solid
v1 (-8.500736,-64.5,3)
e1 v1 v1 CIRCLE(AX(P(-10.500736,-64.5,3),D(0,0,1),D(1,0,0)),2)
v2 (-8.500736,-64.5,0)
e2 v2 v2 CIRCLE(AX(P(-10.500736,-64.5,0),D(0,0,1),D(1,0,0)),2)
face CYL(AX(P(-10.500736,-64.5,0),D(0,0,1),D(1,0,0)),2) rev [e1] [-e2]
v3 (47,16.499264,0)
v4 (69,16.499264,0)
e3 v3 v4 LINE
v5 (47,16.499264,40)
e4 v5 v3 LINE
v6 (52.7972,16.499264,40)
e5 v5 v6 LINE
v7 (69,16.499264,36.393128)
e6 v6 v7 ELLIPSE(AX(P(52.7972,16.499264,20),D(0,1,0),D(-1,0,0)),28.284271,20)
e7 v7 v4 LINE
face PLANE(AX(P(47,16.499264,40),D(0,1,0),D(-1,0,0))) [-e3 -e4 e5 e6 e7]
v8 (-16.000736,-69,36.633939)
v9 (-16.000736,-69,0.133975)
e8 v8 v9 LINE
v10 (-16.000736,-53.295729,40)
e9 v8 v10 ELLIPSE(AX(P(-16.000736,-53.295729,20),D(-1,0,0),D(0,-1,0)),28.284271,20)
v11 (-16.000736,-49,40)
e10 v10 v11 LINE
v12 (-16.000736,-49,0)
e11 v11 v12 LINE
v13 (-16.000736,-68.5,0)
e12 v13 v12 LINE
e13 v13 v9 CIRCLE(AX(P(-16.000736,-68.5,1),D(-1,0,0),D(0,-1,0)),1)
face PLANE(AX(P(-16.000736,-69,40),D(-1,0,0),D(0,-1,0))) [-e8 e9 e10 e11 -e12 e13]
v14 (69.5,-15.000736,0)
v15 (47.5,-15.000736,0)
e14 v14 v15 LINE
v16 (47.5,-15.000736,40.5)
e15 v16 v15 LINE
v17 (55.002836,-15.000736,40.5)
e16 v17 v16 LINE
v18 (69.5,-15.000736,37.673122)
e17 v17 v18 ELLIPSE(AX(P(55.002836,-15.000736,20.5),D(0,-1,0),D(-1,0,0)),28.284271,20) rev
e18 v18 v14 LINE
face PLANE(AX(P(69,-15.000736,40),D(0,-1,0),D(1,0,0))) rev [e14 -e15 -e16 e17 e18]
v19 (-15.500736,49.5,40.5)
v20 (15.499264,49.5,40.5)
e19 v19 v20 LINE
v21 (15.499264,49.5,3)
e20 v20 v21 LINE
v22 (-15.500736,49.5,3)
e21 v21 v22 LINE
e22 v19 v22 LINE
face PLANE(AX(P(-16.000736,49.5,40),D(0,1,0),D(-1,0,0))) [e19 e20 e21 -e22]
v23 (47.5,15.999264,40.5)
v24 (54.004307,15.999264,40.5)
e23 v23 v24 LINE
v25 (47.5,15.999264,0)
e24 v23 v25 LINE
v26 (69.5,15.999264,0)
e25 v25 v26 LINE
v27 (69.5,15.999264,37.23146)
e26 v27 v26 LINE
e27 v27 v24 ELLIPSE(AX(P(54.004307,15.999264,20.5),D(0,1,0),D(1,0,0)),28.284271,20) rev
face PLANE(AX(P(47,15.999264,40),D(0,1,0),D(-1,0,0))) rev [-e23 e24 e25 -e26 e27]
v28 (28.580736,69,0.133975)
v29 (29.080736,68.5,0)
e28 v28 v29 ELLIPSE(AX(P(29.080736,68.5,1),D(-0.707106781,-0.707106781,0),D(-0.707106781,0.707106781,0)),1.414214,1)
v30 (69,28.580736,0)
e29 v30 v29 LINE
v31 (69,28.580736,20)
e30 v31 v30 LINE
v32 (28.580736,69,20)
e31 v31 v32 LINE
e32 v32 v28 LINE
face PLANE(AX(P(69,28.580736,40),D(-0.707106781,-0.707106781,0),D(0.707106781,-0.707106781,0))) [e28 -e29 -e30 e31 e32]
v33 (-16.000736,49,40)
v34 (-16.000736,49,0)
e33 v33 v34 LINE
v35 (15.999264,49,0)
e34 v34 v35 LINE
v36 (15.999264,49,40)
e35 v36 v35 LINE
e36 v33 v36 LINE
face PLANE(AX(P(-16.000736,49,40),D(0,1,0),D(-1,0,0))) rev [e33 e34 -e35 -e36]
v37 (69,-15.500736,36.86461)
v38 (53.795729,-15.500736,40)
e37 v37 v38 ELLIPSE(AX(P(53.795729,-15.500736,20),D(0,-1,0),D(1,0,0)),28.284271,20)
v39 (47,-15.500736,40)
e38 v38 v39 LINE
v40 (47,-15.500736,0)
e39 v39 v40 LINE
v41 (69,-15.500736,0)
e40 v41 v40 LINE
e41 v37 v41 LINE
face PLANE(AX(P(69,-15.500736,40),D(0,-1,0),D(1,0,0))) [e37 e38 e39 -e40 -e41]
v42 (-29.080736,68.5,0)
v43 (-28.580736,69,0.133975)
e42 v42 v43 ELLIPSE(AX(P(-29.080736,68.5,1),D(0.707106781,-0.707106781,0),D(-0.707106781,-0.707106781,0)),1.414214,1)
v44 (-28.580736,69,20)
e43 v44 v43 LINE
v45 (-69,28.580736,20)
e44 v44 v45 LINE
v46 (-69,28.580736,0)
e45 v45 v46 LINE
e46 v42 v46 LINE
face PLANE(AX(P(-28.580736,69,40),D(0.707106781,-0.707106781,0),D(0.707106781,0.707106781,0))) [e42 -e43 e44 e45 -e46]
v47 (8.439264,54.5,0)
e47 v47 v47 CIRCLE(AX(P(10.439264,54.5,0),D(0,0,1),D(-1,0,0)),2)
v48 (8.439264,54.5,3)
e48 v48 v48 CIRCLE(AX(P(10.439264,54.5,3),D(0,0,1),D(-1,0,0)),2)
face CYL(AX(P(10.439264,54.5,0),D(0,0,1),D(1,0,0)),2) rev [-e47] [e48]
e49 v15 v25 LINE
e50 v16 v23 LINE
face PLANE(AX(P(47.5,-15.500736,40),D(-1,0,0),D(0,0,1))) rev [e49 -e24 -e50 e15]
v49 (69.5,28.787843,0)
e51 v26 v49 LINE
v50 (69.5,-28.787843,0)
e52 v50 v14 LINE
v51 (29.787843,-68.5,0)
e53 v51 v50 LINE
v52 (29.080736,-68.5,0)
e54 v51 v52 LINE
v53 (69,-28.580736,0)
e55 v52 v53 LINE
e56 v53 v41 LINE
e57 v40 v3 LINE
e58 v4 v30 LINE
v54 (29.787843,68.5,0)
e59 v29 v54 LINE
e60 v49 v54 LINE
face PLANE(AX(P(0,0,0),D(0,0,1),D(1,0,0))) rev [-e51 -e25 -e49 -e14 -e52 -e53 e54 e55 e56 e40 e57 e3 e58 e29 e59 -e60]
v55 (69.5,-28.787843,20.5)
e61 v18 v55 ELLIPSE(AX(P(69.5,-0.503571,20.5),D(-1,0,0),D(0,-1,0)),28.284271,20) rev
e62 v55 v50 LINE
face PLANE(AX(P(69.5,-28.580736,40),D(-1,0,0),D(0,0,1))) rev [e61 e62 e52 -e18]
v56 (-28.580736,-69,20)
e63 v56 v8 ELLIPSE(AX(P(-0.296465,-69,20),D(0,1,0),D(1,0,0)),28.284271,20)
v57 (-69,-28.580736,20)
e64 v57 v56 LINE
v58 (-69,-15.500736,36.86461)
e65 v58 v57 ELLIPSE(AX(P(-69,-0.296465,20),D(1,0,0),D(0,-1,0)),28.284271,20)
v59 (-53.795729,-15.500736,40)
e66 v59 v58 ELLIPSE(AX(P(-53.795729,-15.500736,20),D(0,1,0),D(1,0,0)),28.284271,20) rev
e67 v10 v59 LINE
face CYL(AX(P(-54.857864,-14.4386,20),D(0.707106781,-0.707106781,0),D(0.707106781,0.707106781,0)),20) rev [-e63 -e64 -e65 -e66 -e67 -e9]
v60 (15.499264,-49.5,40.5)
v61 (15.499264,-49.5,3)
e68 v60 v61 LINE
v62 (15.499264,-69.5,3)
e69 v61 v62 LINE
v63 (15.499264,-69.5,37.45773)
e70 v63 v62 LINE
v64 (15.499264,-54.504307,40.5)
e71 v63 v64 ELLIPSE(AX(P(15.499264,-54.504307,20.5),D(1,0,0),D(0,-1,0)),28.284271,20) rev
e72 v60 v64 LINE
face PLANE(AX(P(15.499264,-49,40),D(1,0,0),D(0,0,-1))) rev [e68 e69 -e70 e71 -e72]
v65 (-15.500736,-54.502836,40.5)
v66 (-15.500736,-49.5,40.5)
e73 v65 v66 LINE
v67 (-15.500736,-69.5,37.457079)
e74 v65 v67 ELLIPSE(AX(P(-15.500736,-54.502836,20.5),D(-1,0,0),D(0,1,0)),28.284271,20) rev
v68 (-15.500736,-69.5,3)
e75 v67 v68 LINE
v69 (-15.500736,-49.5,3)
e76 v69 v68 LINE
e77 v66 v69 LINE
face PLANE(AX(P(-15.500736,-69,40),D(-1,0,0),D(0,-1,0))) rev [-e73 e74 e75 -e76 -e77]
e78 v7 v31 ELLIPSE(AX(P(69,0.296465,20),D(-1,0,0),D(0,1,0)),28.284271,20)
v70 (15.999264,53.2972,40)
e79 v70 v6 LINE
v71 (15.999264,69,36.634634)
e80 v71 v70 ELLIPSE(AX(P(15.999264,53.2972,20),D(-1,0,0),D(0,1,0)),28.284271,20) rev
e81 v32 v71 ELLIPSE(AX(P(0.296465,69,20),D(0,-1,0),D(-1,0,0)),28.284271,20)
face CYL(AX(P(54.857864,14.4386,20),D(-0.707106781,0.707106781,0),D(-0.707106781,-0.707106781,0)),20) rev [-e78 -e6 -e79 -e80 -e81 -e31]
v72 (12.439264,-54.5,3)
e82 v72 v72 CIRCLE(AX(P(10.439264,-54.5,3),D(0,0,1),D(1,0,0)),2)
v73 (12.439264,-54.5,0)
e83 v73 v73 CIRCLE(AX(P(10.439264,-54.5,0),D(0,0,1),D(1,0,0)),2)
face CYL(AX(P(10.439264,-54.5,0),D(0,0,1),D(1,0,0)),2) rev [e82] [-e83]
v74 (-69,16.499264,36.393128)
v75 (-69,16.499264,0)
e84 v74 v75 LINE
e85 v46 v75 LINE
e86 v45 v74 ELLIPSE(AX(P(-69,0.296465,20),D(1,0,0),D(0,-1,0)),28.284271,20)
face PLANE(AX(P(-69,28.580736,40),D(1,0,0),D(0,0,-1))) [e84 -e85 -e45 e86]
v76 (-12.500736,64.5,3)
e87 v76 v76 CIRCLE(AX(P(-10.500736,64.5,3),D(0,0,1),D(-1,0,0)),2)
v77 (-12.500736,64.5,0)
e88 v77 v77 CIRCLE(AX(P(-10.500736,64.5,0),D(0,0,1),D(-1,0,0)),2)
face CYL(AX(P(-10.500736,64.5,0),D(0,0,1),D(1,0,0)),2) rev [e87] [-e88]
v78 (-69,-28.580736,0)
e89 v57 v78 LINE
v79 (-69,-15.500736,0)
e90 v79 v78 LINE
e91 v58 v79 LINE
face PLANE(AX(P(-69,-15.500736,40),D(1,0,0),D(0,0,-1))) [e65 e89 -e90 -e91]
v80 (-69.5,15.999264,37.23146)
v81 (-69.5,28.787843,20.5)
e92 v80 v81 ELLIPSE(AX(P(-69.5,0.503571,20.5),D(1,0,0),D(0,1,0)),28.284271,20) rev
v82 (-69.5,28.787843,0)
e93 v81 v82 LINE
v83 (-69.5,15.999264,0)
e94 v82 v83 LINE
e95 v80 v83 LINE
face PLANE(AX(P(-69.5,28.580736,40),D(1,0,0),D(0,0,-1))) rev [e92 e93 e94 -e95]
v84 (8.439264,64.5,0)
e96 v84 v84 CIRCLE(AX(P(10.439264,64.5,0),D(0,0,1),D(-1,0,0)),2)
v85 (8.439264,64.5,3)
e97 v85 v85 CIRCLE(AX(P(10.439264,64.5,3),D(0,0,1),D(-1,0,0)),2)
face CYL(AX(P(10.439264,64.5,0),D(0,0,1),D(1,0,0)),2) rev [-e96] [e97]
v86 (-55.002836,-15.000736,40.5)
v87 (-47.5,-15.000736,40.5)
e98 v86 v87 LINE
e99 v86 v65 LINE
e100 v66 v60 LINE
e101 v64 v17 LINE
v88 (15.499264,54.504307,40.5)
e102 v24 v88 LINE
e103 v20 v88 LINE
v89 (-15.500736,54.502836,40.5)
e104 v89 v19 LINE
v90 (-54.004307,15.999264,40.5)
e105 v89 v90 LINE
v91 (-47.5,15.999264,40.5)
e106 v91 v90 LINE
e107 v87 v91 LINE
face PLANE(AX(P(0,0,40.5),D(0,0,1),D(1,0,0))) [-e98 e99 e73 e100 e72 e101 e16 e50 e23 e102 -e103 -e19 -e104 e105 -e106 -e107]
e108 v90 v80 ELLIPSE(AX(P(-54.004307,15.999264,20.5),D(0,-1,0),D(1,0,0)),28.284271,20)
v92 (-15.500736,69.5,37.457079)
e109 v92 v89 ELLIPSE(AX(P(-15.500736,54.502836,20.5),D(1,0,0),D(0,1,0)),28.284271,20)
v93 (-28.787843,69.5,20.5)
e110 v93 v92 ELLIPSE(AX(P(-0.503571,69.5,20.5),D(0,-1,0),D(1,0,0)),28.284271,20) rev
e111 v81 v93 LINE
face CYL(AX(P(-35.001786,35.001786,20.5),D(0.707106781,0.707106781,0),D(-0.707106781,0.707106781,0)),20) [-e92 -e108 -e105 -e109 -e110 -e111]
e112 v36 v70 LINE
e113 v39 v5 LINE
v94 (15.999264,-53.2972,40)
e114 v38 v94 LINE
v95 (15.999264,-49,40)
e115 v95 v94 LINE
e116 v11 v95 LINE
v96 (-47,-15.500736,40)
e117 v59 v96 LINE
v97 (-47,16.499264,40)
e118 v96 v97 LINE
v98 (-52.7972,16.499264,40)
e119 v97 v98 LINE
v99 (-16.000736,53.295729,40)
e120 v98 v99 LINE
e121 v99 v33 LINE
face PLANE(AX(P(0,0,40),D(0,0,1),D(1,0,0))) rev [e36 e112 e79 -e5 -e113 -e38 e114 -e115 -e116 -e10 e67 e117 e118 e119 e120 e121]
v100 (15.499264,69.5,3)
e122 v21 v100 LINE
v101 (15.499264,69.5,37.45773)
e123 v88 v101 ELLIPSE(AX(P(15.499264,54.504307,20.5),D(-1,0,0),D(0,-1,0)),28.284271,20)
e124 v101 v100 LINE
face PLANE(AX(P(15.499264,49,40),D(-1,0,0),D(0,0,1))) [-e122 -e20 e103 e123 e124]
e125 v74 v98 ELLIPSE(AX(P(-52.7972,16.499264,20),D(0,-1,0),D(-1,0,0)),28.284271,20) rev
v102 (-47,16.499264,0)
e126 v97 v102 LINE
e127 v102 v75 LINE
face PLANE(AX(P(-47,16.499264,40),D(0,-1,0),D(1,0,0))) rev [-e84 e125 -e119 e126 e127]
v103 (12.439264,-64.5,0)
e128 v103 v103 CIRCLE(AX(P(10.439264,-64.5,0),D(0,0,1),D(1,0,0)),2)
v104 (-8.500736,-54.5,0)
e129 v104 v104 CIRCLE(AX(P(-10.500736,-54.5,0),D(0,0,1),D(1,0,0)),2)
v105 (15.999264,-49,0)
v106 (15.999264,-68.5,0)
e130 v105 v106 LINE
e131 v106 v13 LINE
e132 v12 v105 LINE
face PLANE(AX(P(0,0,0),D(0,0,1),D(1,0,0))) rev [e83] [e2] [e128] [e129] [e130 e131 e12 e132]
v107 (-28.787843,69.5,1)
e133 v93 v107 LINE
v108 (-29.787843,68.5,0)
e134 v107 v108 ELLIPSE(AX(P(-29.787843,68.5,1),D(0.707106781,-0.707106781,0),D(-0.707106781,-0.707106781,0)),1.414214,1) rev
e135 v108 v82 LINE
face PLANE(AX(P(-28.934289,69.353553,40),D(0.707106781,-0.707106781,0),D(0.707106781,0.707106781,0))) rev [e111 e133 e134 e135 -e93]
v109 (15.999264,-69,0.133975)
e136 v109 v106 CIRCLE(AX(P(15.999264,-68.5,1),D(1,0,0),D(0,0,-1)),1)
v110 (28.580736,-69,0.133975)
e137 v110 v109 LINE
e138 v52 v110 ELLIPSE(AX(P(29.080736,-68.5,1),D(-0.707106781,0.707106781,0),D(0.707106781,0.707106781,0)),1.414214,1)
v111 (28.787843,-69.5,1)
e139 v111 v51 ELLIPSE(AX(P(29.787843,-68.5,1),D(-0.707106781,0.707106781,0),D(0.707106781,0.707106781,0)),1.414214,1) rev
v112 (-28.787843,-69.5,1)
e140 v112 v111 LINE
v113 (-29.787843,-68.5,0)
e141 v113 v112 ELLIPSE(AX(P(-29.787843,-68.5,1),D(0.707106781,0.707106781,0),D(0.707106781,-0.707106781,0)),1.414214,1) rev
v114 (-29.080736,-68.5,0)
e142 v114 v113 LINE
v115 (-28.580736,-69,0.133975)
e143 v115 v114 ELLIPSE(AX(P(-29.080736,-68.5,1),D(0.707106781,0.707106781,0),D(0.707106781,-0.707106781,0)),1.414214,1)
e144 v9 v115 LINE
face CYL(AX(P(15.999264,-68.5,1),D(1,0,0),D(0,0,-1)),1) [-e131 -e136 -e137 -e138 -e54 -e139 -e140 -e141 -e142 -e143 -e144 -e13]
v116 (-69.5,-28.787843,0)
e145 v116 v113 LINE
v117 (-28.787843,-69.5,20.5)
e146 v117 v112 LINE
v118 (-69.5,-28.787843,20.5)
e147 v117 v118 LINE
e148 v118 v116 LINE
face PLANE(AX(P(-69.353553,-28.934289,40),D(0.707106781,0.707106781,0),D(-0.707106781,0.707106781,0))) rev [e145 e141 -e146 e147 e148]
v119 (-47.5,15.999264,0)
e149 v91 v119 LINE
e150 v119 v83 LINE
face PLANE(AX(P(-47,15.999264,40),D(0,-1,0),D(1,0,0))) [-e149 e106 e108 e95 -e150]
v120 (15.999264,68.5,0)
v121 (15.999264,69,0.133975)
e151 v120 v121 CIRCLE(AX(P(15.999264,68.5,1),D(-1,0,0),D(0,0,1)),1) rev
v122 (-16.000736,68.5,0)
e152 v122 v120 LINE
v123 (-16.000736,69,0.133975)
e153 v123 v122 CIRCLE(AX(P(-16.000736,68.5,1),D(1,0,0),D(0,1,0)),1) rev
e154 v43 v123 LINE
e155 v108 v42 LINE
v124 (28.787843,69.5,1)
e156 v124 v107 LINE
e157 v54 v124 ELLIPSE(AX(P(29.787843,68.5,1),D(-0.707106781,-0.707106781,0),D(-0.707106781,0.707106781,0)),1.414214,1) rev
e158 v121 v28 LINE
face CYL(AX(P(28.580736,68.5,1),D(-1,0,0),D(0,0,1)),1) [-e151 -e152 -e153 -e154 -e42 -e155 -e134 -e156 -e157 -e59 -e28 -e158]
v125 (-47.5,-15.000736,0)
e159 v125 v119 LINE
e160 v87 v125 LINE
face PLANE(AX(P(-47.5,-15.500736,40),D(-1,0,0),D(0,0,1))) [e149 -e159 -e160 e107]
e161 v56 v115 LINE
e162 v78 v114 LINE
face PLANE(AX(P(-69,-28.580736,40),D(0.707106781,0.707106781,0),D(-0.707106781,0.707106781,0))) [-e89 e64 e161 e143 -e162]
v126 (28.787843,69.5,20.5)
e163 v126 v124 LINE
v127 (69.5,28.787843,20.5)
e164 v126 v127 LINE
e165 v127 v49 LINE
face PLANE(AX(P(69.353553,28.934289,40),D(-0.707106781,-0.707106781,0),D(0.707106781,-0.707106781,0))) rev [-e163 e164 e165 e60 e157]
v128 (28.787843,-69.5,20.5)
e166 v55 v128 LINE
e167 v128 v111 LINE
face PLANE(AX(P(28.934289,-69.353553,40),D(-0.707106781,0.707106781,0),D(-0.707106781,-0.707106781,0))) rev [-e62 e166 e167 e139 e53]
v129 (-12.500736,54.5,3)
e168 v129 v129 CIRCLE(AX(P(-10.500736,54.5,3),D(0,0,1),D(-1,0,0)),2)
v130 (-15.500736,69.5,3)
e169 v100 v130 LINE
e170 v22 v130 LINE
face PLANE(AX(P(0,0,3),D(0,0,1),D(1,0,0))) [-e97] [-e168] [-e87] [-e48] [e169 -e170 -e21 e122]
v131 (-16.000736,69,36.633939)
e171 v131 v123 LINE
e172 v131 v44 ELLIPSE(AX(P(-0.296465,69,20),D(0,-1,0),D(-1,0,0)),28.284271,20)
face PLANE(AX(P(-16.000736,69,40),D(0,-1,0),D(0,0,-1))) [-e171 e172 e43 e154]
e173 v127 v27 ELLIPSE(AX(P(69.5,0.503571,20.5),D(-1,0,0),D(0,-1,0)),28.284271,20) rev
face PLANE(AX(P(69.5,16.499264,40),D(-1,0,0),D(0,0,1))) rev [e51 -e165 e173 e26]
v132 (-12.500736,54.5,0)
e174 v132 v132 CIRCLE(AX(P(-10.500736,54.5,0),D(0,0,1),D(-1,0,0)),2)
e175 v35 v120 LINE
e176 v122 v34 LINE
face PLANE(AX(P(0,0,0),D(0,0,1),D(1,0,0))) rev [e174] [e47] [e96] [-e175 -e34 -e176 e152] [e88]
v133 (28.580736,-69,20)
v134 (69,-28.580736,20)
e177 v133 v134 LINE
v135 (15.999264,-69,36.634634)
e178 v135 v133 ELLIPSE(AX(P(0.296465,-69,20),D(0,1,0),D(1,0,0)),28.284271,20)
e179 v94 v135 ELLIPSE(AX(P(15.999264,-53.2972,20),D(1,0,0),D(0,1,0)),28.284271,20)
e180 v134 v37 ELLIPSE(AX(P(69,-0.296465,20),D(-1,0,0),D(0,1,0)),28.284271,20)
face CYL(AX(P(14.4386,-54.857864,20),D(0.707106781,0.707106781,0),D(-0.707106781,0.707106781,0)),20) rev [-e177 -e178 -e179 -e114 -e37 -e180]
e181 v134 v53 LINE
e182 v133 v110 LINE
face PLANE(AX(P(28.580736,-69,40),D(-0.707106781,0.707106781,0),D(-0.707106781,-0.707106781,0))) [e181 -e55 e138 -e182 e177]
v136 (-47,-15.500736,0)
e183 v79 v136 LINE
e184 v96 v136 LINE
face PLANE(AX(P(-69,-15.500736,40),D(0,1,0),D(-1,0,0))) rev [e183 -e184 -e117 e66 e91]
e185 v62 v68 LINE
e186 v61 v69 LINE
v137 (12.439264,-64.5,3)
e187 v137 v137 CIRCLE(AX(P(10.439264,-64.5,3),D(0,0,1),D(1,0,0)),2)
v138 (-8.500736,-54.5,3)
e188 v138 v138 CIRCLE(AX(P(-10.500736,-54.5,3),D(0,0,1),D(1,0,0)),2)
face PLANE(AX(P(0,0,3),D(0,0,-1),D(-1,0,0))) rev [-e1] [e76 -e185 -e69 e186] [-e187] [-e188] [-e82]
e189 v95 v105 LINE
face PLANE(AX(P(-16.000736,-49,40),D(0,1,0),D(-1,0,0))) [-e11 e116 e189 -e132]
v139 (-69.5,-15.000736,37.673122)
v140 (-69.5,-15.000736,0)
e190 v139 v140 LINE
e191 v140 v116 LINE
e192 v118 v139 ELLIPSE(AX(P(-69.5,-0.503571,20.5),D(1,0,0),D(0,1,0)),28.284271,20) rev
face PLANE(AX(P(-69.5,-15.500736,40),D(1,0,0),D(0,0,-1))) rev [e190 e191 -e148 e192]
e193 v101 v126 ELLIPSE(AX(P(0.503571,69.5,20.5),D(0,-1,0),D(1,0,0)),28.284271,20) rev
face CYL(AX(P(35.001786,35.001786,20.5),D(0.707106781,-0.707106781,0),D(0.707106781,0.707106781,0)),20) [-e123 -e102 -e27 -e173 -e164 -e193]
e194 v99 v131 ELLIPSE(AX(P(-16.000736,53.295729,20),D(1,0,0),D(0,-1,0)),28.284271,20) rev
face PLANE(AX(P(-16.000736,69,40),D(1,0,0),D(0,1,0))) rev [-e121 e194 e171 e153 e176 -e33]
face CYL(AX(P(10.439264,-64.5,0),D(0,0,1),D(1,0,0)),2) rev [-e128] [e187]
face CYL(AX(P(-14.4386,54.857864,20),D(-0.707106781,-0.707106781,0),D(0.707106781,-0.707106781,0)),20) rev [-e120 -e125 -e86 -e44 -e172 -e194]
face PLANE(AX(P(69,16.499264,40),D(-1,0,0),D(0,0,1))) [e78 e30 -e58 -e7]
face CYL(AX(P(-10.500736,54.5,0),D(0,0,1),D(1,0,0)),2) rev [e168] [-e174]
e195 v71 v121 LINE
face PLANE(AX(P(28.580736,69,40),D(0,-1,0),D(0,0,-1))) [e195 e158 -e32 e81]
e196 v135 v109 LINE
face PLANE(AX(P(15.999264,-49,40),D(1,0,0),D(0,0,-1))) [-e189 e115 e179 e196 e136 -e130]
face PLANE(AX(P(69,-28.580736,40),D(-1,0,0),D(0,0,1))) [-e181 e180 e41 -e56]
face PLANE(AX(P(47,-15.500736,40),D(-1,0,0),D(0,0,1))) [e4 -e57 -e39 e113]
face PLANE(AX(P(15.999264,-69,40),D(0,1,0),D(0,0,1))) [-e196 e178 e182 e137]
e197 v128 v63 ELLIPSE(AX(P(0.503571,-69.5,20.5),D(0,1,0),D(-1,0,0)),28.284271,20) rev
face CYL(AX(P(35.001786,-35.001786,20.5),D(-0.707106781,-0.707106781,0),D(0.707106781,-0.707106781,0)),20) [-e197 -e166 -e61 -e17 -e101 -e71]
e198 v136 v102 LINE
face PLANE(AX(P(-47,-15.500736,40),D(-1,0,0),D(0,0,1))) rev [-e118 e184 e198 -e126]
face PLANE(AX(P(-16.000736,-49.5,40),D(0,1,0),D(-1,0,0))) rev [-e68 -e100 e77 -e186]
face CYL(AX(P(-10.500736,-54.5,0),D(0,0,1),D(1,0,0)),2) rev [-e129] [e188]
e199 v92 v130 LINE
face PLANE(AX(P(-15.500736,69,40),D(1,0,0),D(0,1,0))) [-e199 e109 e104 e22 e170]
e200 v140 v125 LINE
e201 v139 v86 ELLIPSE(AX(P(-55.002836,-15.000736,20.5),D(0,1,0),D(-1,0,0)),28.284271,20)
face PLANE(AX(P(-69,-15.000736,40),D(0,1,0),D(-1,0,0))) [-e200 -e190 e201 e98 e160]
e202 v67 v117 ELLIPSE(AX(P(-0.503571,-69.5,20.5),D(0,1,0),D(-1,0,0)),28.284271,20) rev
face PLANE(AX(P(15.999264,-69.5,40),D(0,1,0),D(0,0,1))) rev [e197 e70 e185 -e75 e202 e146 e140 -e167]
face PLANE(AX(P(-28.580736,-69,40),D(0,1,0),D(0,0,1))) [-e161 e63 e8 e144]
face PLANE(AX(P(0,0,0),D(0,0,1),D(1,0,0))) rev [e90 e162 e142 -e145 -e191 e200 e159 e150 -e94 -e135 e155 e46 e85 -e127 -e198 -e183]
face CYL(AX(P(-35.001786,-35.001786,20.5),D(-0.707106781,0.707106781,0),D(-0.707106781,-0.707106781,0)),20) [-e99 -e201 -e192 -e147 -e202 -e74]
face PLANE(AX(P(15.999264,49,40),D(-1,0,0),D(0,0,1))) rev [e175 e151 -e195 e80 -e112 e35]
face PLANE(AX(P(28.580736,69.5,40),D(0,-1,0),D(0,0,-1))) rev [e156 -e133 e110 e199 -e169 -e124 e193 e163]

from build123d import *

# Parameters (mm, degrees)
RESSALTO_EXTRUS_O1_DEPTH = 40
CASCA1_T                 = 0.5
ESBO_O2_W                = 31
ESBO_O2_H                = 20
RESSALTO_EXTRUS_O2_DEPTH = 3
FILETE1_R                = 20
FILETE2_R                = 20
ESBO_O3_R                = 2
CORTE_EXTRUS_O1_DEPTH    = 106.198621664
FILETE3_R                = 1
FILETE4_R                = 1


with BuildPart() as part:
    # Esboço1 → Ressalto-extrusão1 (new body)
    with BuildSketch(Plane.XY):
        Polygon((-16.000735804, -69), (-16.000735804, -49), (15.999264196, -49), (15.999264196, -69), (28.580735804, -69), (69, -28.580735804), (69, -15.500735804), (47, -15.500735804), (47, 16.499264196), (69, 16.499264196), (69, 28.580735804), (28.580735804, 69), (15.999264196, 69), (15.999264196, 49), (-16.000735804, 49), (-16.000735804, 69), (-28.580735804, 69), (-69, 28.580735804), (-69, 16.499264196), (-47, 16.499264196), (-47, -15.500735804), (-69, -15.500735804), (-69, -28.580735804), (-28.580735804, -69), align=None)
    extrude(amount=RESSALTO_EXTRUS_O1_DEPTH)

    # Casca1
    casca1_openings = [part.faces().sort_by_distance(p)[0] for p in [
        (7.1958e-05, -0.05370825, 0),
    ]]
    offset(amount=CASCA1_T, openings=casca1_openings, kind=Kind.INTERSECTION)

    # Esboço2 → Ressalto-extrusão2 (add)
    with BuildSketch(Plane.XY):
        with Locations((-0.000735804, -59.5)):
            Rectangle(ESBO_O2_W, ESBO_O2_H)
        with Locations((-0.000735804, 59.5)):
            Rectangle(ESBO_O2_W, ESBO_O2_H)
    extrude(amount=RESSALTO_EXTRUS_O2_DEPTH)

    # Filete1
    filete1_edges = [part.edges().sort_by_distance(p)[0] for p in [
        (-49.143921292, 49.143921292, 40.5),
        (49.143921292, -49.143921292, 40.5),
        (-49.143921292, -49.143921292, 40.5),
        (49.143921292, 49.143921292, 40.5),
    ]]
    fillet(filete1_edges, radius=FILETE1_R)

    # Filete2
    filete2_edges = [part.edges().sort_by_distance(p)[0] for p in [
        (-48.790367902, 48.790367902, 40),
        (-48.790367902, -48.790367902, 40),
        (48.790367902, -48.790367902, 40),
        (48.790367902, 48.790367902, 40),
    ]]
    fillet(filete2_edges, radius=FILETE2_R)

    # Esboço3 → Corte-extrusão1 (cut, through all)
    with BuildSketch(Plane.XY.offset(3)):
        with Locations((-10.500735804, -54.5)):
            Circle(ESBO_O3_R)
        with Locations((-10.500735804, -64.5)):
            Circle(ESBO_O3_R)
        with Locations((10.439264196, -64.5)):
            Circle(ESBO_O3_R)
        with Locations((10.439264196, -54.5)):
            Circle(ESBO_O3_R)
        with Locations(Location((10.439264196, 54.5, 0), (0, 0, 180))):
            Circle(ESBO_O3_R)
        with Locations(Location((10.439264196, 64.5, 0), (0, 0, 180))):
            Circle(ESBO_O3_R)
        with Locations(Location((-10.500735804, 64.5, 0), (0, 0, 180))):
            Circle(ESBO_O3_R)
        with Locations(Location((-10.500735804, 54.5, 0), (0, 0, 180))):
            Circle(ESBO_O3_R)
    extrude(amount=-CORTE_EXTRUS_O1_DEPTH, mode=Mode.SUBTRACT)

    # Filete3
    # the kernel refuses this fillet: 1 mm, written as the material it takes off along each edge
    with BuildSketch(Plane(origin=(31.287842585, -69.5, 0), x_dir=(0, 1, 0), z_dir=(-1, 0, 0))) as filete3_piece_1:
        with BuildLine():
            CenterArc((FILETE3_R, -FILETE3_R), FILETE3_R, 90, 90)
            Line((0, -FILETE3_R), (0, 0))
            Line((0, 0), (FILETE3_R, 0))
        make_face()
    extrude(amount=62.57568517, mode=Mode.SUBTRACT)

    # Filete4
    # the kernel refuses this fillet: 1 mm, written as the material it takes off along each edge
    with BuildSketch(Plane(origin=(-31.287842585, 69.5, 0), x_dir=(0, -1, 0), z_dir=(1, 0, 0))) as filete4_piece_1:
        with BuildLine():
            CenterArc((FILETE4_R, -FILETE4_R), FILETE4_R, 90, 90)
            Line((0, -FILETE4_R), (0, 0))
            Line((0, 0), (FILETE4_R, 0))
        make_face()
    extrude(amount=62.57568517, mode=Mode.SUBTRACT)


solid = part.part
